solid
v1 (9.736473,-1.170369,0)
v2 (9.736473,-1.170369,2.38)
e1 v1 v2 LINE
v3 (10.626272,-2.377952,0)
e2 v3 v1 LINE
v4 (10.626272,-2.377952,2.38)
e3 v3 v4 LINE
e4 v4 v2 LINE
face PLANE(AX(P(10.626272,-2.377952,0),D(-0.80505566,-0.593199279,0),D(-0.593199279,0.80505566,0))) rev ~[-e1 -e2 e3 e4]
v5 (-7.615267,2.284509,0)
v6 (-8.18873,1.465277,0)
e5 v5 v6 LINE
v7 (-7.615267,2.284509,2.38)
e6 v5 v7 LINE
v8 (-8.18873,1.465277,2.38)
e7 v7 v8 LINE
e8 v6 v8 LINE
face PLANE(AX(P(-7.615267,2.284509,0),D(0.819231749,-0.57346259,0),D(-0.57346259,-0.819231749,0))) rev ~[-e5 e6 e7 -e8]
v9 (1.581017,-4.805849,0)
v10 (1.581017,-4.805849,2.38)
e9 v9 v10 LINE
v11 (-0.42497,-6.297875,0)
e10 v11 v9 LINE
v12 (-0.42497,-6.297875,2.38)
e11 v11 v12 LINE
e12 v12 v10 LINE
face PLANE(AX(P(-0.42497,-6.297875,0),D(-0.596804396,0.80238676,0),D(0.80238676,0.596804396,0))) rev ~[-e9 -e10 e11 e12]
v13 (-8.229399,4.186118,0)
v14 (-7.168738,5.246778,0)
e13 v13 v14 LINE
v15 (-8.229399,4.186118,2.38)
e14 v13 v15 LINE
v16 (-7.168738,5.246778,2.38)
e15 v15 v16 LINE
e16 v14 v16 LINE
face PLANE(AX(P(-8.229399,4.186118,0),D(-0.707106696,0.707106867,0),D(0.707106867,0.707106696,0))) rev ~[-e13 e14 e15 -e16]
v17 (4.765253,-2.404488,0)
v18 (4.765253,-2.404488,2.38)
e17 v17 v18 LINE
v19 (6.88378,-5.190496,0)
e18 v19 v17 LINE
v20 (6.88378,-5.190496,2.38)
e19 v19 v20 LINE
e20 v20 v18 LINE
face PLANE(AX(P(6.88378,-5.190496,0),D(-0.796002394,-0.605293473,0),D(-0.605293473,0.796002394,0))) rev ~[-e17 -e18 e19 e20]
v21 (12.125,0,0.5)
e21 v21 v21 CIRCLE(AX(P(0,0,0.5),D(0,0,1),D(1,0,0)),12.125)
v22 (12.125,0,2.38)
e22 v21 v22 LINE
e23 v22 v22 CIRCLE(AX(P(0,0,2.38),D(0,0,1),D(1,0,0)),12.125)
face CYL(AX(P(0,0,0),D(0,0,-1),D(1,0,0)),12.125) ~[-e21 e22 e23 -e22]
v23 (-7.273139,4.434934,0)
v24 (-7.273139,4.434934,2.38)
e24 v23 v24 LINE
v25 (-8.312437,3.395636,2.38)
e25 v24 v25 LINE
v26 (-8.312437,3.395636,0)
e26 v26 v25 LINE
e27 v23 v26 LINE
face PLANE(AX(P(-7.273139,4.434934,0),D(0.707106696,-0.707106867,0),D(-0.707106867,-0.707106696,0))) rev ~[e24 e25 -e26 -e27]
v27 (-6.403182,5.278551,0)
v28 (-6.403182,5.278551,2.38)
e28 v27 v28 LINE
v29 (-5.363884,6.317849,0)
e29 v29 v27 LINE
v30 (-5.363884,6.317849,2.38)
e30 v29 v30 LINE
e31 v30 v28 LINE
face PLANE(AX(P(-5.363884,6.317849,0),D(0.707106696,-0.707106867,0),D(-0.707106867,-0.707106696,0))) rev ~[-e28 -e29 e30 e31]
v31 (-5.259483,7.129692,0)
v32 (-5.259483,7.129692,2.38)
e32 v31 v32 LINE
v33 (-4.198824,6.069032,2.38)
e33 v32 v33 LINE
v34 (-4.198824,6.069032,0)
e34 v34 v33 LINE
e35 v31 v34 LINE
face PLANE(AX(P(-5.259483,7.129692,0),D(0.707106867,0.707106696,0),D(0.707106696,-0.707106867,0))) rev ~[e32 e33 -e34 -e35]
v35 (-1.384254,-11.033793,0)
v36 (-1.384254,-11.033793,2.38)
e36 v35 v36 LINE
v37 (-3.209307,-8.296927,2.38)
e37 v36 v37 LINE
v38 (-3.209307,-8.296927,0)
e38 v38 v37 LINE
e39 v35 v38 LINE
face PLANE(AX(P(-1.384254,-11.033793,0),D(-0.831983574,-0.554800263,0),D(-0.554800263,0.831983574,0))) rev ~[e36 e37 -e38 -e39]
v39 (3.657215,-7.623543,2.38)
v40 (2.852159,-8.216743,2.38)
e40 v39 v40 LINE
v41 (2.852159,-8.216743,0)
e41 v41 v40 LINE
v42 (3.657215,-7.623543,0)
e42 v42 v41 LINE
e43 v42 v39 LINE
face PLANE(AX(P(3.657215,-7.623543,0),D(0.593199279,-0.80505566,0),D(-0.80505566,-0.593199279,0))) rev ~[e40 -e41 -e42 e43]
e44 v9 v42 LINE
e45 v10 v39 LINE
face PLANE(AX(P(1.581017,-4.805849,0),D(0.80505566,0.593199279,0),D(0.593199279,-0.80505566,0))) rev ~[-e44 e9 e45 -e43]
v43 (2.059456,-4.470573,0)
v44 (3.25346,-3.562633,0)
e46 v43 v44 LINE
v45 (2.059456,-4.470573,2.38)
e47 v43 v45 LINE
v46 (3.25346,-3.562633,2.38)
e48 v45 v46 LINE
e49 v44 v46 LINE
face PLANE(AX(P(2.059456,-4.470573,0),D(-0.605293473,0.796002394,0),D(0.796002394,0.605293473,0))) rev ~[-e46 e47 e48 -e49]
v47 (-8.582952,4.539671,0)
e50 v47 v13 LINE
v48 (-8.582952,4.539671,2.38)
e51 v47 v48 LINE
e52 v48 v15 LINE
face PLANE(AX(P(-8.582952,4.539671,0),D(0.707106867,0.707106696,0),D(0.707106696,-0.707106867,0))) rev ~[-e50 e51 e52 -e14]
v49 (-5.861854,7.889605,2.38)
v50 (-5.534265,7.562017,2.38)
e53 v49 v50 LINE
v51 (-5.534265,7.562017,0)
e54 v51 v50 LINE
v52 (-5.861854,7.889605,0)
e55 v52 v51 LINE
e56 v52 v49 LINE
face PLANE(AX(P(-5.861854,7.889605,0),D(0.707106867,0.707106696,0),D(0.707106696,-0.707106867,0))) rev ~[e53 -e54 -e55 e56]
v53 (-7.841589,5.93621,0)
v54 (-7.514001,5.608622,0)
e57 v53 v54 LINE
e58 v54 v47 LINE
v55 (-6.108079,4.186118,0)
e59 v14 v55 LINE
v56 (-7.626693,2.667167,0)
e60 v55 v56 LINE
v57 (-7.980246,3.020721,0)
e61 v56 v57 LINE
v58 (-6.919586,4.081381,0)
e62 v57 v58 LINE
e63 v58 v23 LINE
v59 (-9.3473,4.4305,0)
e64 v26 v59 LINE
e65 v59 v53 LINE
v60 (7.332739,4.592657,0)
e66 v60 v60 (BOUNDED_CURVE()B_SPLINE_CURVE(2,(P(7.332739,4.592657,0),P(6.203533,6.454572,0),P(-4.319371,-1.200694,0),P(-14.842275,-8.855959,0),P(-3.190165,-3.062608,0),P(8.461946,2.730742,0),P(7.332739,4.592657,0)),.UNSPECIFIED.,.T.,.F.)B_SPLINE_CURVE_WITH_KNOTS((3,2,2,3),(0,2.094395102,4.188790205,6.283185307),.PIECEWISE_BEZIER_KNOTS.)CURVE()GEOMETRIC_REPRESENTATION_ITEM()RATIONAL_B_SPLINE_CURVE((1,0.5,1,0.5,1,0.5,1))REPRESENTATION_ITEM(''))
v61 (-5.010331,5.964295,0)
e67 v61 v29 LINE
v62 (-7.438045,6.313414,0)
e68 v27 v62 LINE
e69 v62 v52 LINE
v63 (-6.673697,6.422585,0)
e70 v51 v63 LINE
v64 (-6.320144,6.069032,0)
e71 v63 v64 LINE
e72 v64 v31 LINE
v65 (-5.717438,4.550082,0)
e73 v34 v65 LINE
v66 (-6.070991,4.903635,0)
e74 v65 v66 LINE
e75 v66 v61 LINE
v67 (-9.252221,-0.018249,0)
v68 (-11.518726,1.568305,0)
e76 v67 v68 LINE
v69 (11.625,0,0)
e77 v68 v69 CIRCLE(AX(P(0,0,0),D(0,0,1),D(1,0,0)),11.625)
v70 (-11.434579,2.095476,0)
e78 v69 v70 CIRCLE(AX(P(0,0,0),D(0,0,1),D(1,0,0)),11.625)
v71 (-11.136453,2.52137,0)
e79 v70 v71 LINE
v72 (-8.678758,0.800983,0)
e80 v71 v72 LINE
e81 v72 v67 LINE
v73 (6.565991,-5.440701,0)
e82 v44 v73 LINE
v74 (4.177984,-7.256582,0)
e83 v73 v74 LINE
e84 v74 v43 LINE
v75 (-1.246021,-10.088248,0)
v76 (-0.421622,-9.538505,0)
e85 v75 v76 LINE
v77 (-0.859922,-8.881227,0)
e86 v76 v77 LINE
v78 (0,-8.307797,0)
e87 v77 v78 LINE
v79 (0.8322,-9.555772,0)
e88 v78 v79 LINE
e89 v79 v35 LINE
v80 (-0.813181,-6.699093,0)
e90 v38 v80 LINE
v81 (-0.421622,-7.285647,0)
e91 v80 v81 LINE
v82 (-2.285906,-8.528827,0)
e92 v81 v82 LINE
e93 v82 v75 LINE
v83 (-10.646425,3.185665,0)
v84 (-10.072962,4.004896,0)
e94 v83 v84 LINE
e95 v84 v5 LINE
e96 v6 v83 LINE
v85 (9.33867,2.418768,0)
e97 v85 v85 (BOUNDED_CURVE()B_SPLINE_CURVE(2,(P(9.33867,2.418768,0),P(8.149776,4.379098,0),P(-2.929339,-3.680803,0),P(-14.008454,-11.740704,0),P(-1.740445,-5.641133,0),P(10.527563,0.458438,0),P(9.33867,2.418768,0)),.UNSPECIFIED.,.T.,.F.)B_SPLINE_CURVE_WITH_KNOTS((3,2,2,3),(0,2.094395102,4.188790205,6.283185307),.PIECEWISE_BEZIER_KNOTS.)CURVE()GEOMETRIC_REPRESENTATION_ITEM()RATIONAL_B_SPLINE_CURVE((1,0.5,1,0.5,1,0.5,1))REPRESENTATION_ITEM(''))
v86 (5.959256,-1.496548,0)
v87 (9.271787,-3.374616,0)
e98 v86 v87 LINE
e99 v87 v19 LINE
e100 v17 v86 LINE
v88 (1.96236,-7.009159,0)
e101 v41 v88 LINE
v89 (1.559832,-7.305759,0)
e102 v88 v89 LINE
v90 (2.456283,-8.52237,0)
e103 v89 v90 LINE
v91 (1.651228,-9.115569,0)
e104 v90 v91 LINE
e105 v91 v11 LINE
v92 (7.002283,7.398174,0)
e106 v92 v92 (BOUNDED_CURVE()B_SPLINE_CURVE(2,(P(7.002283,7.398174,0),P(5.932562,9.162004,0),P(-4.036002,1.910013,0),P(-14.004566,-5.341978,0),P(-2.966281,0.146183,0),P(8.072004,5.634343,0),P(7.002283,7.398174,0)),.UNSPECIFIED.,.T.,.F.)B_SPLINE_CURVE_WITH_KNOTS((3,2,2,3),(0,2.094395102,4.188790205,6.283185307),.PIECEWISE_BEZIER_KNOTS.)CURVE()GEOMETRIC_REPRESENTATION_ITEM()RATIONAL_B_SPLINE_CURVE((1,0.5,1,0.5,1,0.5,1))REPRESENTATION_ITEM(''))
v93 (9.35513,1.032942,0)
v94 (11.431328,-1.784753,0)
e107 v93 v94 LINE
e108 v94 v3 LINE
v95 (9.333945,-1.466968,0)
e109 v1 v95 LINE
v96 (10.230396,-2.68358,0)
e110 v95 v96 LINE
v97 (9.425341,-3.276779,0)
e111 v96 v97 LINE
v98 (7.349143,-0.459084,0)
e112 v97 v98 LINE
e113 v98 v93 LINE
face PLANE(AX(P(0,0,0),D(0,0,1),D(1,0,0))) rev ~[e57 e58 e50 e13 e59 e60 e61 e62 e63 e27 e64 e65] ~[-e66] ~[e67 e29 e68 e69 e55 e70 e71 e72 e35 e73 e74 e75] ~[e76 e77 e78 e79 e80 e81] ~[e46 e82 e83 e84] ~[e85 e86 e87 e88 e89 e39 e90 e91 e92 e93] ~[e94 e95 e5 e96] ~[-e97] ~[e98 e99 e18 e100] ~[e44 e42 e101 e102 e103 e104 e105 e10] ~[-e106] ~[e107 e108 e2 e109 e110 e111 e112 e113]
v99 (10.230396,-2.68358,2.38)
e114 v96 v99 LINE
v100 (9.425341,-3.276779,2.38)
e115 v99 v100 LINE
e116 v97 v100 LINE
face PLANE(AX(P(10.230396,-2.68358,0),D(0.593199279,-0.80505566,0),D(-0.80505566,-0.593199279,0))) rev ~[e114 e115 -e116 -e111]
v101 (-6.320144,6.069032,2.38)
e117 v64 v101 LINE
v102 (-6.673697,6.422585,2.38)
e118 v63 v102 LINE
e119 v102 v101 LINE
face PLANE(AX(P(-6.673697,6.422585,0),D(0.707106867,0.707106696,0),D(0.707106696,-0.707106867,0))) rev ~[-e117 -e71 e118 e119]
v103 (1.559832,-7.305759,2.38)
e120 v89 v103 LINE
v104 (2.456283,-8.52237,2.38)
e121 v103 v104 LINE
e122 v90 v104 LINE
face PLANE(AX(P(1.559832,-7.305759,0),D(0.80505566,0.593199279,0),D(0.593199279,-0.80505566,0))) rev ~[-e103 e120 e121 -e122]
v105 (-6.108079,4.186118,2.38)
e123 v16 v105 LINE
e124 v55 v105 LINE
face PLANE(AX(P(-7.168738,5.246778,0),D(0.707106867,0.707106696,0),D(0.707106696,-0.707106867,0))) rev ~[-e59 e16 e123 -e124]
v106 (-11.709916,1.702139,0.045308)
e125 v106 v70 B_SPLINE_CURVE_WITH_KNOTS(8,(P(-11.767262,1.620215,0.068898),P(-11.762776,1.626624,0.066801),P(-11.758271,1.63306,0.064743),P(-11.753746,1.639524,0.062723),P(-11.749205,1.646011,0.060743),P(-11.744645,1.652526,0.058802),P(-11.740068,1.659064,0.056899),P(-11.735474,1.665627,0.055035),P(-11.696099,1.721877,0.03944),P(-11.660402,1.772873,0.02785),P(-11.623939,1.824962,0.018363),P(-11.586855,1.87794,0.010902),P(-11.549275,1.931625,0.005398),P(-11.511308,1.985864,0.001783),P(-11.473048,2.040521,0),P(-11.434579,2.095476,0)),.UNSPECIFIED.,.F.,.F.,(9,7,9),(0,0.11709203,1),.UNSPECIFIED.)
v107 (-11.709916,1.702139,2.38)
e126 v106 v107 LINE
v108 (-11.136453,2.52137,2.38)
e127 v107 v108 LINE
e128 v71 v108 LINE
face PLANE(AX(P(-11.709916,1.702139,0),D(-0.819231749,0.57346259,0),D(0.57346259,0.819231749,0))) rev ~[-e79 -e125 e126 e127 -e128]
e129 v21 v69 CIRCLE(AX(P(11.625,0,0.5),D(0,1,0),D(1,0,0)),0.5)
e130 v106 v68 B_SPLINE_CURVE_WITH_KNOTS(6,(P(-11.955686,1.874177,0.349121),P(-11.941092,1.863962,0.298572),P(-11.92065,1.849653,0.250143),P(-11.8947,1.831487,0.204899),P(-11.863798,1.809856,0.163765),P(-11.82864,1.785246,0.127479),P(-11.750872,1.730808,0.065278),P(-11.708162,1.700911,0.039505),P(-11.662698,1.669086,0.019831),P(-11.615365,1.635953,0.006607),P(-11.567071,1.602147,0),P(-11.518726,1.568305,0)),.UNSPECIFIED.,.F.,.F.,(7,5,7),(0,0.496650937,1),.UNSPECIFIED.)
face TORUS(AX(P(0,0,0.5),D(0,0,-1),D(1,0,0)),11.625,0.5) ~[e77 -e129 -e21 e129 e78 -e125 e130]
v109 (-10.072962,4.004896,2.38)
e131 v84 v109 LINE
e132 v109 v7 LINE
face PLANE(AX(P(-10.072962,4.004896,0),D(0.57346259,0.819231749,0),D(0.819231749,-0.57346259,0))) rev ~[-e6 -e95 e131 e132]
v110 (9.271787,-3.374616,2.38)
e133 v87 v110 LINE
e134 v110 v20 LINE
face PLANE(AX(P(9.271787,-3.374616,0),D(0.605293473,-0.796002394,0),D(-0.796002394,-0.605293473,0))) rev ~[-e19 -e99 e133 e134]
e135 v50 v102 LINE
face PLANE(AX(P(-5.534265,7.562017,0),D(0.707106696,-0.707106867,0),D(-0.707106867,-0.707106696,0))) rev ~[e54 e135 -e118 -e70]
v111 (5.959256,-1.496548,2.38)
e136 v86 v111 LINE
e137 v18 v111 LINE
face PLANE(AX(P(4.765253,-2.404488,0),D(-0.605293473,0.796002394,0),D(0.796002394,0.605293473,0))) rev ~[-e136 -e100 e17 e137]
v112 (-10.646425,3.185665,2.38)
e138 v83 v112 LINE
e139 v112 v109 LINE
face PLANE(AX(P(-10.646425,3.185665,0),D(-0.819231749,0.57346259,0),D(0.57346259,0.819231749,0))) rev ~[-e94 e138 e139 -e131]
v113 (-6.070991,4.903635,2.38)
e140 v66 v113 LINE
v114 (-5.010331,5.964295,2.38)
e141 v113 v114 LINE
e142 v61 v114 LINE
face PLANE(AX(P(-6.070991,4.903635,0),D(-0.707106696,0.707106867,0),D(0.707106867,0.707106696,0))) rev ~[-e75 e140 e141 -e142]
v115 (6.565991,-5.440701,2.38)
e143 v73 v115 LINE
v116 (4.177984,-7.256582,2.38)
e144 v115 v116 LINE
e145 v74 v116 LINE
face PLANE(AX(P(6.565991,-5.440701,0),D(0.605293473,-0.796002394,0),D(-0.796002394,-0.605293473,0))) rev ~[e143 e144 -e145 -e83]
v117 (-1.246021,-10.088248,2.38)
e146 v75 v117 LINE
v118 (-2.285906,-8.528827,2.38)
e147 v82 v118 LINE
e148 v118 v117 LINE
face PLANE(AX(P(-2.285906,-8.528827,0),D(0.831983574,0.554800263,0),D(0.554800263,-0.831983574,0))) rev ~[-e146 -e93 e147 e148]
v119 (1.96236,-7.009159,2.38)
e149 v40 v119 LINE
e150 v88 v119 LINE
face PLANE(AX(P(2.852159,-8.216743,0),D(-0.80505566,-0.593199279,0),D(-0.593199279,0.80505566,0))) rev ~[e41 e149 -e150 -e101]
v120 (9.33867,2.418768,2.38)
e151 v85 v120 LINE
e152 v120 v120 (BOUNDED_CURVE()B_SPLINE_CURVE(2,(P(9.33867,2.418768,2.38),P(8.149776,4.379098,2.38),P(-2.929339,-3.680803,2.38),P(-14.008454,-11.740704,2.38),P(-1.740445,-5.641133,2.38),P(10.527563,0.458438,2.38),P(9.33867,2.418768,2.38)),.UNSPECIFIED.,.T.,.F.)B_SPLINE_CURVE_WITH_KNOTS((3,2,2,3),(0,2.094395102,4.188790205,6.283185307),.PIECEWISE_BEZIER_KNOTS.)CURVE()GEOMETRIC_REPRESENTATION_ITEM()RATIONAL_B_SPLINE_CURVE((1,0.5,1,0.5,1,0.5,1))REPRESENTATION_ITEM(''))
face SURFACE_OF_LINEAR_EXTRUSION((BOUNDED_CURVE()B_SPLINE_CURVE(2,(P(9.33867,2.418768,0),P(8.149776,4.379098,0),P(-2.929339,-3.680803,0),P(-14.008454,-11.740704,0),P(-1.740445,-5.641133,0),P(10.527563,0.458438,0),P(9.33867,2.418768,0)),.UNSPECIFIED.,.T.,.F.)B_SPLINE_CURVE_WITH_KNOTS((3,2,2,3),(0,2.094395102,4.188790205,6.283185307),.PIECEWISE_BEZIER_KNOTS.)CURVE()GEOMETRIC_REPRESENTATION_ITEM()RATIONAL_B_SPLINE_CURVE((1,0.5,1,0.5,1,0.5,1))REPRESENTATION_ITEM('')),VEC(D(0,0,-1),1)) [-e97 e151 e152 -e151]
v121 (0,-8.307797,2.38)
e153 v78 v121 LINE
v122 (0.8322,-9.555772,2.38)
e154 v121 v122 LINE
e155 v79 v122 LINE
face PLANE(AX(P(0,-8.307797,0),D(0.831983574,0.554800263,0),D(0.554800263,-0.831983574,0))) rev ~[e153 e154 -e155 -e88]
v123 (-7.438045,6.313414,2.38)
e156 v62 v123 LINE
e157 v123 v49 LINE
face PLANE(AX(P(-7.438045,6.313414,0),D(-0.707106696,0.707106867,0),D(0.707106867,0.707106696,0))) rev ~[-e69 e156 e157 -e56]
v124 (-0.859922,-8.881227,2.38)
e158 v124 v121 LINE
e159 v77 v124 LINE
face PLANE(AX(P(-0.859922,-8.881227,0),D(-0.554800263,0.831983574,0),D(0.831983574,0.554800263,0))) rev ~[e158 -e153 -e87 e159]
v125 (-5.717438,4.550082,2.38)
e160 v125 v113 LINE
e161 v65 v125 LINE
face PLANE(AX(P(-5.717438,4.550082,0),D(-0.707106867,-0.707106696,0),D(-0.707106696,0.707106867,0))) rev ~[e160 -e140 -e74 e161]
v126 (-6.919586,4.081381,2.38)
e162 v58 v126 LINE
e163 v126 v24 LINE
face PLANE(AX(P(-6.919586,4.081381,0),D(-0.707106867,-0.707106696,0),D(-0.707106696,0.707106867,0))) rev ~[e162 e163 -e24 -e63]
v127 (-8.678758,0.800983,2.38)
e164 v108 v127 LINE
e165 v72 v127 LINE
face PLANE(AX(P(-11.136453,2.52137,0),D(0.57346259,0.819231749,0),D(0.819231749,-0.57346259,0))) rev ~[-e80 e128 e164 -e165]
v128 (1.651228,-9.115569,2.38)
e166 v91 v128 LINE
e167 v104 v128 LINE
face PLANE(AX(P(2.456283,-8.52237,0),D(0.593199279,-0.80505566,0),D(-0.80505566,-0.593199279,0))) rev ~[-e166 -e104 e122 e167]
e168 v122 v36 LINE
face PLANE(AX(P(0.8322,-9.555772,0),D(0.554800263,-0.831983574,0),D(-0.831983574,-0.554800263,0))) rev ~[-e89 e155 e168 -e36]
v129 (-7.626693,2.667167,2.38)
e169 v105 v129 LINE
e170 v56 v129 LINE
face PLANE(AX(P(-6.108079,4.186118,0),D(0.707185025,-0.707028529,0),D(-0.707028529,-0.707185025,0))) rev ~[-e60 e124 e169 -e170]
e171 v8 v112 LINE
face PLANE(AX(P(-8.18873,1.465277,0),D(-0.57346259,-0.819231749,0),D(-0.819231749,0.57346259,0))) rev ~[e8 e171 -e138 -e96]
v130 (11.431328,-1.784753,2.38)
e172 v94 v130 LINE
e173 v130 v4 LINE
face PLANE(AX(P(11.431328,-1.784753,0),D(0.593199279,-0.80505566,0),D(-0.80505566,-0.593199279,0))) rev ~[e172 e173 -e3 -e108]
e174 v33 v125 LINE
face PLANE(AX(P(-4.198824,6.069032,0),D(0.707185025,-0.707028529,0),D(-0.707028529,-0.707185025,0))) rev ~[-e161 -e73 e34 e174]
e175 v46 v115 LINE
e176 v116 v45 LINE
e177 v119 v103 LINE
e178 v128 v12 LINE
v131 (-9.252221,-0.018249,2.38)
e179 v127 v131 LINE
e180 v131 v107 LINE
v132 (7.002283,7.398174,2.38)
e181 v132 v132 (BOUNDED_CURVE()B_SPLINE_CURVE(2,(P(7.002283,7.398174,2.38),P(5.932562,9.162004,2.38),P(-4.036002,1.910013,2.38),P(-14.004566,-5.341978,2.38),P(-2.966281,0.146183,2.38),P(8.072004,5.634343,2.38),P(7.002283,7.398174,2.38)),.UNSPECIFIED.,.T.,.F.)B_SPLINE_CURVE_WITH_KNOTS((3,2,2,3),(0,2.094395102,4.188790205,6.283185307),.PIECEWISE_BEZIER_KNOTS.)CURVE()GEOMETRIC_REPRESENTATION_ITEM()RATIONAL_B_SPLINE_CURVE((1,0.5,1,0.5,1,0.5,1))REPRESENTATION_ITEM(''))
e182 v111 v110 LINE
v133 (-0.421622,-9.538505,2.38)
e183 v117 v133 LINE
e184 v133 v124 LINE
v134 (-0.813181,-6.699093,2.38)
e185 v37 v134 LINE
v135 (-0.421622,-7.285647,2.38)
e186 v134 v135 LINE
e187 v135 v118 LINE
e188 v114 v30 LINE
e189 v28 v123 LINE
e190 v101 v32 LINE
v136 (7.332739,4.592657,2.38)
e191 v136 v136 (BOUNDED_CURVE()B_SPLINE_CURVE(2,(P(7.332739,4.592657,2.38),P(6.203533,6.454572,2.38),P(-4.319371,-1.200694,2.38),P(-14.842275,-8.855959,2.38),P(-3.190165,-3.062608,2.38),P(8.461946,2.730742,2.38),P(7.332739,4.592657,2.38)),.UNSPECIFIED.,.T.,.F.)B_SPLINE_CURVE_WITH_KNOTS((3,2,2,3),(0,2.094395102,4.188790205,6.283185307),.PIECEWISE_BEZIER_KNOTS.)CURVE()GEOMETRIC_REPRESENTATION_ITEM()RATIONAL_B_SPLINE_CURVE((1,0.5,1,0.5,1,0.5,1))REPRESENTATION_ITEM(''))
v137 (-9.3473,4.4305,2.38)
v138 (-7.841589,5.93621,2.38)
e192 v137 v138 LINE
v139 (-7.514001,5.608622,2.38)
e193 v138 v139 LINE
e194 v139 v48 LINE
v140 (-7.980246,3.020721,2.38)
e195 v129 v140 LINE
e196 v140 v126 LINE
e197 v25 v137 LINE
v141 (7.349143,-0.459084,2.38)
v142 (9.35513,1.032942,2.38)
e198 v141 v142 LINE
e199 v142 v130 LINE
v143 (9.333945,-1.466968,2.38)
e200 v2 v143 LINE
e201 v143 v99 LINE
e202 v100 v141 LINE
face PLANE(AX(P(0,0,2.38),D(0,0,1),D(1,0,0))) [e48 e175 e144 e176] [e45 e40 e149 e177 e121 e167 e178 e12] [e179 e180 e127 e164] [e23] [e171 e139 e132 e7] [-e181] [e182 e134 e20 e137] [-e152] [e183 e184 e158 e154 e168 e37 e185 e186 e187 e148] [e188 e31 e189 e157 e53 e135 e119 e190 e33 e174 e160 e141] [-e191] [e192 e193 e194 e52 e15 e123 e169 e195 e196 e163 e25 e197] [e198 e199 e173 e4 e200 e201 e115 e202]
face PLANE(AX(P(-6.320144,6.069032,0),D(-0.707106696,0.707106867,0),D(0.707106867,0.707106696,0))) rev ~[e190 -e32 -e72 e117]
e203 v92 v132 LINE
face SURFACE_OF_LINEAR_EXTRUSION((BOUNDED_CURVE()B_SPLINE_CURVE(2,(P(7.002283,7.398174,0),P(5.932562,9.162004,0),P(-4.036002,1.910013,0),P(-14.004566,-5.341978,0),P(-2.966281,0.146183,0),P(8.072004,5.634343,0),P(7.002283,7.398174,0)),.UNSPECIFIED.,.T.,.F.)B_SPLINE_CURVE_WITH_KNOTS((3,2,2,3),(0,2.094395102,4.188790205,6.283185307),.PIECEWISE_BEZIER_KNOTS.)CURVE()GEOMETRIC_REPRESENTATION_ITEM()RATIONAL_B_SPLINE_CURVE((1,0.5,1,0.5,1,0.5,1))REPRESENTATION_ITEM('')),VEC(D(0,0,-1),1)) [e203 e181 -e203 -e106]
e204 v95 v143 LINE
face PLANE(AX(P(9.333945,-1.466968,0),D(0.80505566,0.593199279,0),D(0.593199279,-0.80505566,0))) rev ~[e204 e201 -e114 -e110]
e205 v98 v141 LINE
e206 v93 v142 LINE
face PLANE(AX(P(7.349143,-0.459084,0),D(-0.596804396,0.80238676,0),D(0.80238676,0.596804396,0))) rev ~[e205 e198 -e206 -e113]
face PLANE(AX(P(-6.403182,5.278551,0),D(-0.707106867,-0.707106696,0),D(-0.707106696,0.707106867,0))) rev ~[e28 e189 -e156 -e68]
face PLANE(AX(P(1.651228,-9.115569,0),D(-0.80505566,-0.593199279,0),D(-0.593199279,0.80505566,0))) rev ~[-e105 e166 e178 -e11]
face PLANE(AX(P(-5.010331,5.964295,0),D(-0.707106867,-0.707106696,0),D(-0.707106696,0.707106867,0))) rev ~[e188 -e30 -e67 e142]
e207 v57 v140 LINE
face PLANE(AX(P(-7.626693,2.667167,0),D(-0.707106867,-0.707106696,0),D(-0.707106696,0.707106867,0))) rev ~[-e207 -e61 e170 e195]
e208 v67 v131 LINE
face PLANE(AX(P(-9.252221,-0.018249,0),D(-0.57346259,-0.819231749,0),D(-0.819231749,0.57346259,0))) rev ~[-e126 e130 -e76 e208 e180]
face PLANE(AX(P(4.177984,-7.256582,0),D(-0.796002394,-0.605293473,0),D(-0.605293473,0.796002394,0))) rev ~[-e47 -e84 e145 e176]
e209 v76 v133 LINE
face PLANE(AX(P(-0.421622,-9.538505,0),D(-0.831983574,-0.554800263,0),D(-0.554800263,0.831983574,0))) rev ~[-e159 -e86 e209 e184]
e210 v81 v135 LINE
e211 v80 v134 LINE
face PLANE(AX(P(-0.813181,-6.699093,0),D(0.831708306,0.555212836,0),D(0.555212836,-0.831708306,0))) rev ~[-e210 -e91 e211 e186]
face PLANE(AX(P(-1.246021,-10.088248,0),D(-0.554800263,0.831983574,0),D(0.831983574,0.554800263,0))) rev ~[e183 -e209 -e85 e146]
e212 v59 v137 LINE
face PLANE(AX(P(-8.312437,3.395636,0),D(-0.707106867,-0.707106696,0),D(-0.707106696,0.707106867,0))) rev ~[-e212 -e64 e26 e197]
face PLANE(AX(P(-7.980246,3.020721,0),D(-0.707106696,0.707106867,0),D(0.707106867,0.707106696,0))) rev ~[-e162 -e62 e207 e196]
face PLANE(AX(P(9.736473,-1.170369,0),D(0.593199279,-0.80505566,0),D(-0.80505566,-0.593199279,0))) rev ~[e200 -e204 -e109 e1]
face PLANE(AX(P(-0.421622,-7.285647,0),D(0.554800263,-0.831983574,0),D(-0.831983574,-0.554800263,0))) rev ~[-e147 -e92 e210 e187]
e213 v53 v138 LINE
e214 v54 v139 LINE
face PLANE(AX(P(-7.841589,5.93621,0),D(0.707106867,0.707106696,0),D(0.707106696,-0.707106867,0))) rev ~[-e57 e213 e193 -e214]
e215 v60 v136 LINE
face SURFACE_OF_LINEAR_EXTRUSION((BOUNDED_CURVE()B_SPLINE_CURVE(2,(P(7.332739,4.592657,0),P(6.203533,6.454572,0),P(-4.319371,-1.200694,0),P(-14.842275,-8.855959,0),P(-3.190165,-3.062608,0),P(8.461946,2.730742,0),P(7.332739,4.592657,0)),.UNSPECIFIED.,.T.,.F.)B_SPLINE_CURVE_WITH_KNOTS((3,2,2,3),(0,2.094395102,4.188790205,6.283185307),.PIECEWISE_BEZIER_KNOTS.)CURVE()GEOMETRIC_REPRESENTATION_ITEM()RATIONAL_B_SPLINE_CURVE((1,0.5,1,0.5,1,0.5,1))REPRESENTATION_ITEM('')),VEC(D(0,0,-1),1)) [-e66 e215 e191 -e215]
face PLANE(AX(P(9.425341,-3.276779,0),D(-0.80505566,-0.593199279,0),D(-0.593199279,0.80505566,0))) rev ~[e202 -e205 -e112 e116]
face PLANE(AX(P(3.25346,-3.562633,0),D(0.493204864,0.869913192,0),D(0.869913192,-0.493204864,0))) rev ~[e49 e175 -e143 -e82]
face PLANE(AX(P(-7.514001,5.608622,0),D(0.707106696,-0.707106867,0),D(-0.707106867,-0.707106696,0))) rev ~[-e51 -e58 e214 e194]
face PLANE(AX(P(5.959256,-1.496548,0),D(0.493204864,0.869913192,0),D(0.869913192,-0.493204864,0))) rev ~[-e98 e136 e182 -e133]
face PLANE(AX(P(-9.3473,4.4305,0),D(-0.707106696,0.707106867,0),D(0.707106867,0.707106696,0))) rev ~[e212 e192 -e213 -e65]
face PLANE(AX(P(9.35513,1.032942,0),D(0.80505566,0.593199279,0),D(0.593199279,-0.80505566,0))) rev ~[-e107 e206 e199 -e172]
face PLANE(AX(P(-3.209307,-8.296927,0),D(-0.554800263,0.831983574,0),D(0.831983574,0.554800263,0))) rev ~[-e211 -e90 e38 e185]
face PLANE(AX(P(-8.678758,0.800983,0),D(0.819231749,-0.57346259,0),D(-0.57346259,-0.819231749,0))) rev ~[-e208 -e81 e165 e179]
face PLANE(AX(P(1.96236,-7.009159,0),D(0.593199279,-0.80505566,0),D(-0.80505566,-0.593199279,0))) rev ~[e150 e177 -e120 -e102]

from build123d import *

# Parameters (mm, degrees)
F0_R     = 12.125
F2_DEPTH = 2.38


# Not quite as in the source:
# - a fillet or chamfer that OpenCascade refuses, or shapes differently, is made with other operations: its cross-section is extruded or revolved along the edge and cut away or added


with BuildPart() as f2:
    # F0 (on Top) → F2 (new body)
    with BuildSketch(Plane.XY):
        Circle(F0_R)
        Polygon((-3.2093067312, -8.296926559), (-0.8131807139, -6.6990929169), (-0.4216222868, -7.2856470722), (-2.2859056129, -8.5288265191), (-1.2460206689, -10.08824754), (-0.4216222869, -9.5385053896), (-0.8599218546, -8.8812273288), (0, -8.3077966916), (0.8322003947, -9.5557720532), (-1.3842535445, -11.0337930941), align=None, mode=Mode.SUBTRACT)
        Polygon((2.4562833268, -8.5223700524), (1.651227667, -9.1155693314), (-0.4249698094, -6.2978745219), (1.5810172705, -4.8058485212), (3.6572147468, -7.6235433307), (2.852159087, -8.2167426096), (1.9623601685, -7.0091591199), (1.5598323386, -7.3057587593), align=None, mode=Mode.SUBTRACT)
        Polygon((6.5659907646, -5.4407012337), (4.1779835818, -7.2565816525), (2.0594564267, -4.4705732726), (3.253460018, -3.5626330632), align=None, mode=Mode.SUBTRACT)
        with BuildLine():
            add(Edge.make_bspline(
                [(9.3386698082, 2.4187678684), (8.1497764129, 4.3790980975), (-2.9293388718, -3.6808031421), (-14.0084541566, -11.7407043817), (-1.7404454766, -5.6411333711), (10.5275632034, 0.4584376394), (9.3386698082, 2.4187678684)],
                knots=[0, 0, 0, 2.0943951024, 2.0943951024, 4.1887902048, 4.1887902048, 6.2831853072, 6.2831853072, 6.2831853072], degree=2, weights=[1, 0.5, 1, 0.5, 1, 0.5, 1]))
        make_face(mode=Mode.SUBTRACT)
        Polygon((9.2717871239, -3.3746159405), (6.8837799411, -5.1904963592), (4.7652527859, -2.4044879793), (5.9592563773, -1.49654777), align=None, mode=Mode.SUBTRACT)
        Polygon((10.230396352, -2.6835796259), (9.4253406921, -3.2767789049), (7.3491432158, -0.4590840954), (9.3551302956, 1.0329419053), (11.431327772, -1.7847529042), (10.6262721121, -2.3779521831), (9.7364731937, -1.1703686933), (9.3339453638, -1.4669683328), align=None, mode=Mode.SUBTRACT)
        Polygon((-9.252220741, -0.0182491862), (-11.7099159868, 1.7021385838), (-11.1364533968, 2.5213703323), (-8.678758151, 0.8009825624), align=None, mode=Mode.SUBTRACT)
        Polygon((-8.1887295845, 1.4652768326), (-10.6464248303, 3.1856646026), (-10.0729622403, 4.0048963511), (-7.6152669945, 2.2845085812), align=None, mode=Mode.SUBTRACT)
        Polygon((-9.347300169, 4.430499518), (-7.841588868, 5.936210455), (-7.5140006084, 5.6086221162), (-8.5829520327, 4.5396709503), (-8.2293986849, 4.186117517), (-7.1687383849, 5.2467775605), (-6.1080785977, 4.186117517), (-7.6266925716, 2.6671674091), (-7.9802459194, 3.0207208425), (-6.9195856195, 4.0813808861), (-7.2731389673, 4.4349343194), (-8.3124372196, 3.3956363184), align=None, mode=Mode.SUBTRACT)
        with BuildLine():
            add(Edge.make_bspline(
                [(7.3327392075, 4.5926569432), (6.2035325254, 6.4545715628), (-4.3193714297, -1.2006937226), (-14.8422753849, -8.855959008), (-3.1901647477, -3.0626083422), (8.4619458895, 2.7307423236), (7.3327392075, 4.5926569432)],
                knots=[0, 0, 0, 2.0943951024, 2.0943951024, 4.1887902048, 4.1887902048, 6.2831853072, 6.2831853072, 6.2831853072], degree=2, weights=[1, 0.5, 1, 0.5, 1, 0.5, 1]))
        make_face(mode=Mode.SUBTRACT)
        Polygon((-7.4380451802, 6.3134137932), (-5.8618537193, 7.8896048731), (-5.5342654597, 7.5620165344), (-6.6736970439, 6.4225852256), (-6.320143696, 6.0690317922), (-5.2594833961, 7.1296918358), (-4.1988236089, 6.0690317922), (-5.7174375827, 4.5500816844), (-6.0709909306, 4.9036351177), (-5.0103306306, 5.9642951613), (-5.3638839785, 6.3178485947), (-6.4031822307, 5.2785505936), align=None, mode=Mode.SUBTRACT)
        with BuildLine():
            add(Edge.make_bspline(
                [(7.0022831521, 7.3981736055), (5.9325623329, 9.1620037916), (-4.0360019856, 1.9100128299), (-14.0045663042, -5.3419781317), (-2.9662811665, 0.1461826439), (8.0720039713, 5.6343434195), (7.0022831521, 7.3981736055)],
                knots=[0, 0, 0, 2.0943951024, 2.0943951024, 4.1887902048, 4.1887902048, 6.2831853072, 6.2831853072, 6.2831853072], degree=2, weights=[1, 0.5, 1, 0.5, 1, 0.5, 1]))
        make_face(mode=Mode.SUBTRACT)
    extrude(amount=F2_DEPTH)

    # F3: fillet of radius 0.5 on 1 edges, made by hand

    # F3_s1 → F3_t2 (revolve, cut)
    with BuildSketch(Plane.XZ):
        with BuildLine():
            ThreePointArc((12.125, 0.5), (11.9785533906, 0.1464466094), (11.625, 0))
            Line((11.625, 0), (12.125, 0))
            Line((12.125, 0), (12.125, 0.5))
        make_face()
    revolve(axis=Axis((0, 0, 0), (0, 0, 1)), mode=Mode.SUBTRACT)


solid = f2.part
